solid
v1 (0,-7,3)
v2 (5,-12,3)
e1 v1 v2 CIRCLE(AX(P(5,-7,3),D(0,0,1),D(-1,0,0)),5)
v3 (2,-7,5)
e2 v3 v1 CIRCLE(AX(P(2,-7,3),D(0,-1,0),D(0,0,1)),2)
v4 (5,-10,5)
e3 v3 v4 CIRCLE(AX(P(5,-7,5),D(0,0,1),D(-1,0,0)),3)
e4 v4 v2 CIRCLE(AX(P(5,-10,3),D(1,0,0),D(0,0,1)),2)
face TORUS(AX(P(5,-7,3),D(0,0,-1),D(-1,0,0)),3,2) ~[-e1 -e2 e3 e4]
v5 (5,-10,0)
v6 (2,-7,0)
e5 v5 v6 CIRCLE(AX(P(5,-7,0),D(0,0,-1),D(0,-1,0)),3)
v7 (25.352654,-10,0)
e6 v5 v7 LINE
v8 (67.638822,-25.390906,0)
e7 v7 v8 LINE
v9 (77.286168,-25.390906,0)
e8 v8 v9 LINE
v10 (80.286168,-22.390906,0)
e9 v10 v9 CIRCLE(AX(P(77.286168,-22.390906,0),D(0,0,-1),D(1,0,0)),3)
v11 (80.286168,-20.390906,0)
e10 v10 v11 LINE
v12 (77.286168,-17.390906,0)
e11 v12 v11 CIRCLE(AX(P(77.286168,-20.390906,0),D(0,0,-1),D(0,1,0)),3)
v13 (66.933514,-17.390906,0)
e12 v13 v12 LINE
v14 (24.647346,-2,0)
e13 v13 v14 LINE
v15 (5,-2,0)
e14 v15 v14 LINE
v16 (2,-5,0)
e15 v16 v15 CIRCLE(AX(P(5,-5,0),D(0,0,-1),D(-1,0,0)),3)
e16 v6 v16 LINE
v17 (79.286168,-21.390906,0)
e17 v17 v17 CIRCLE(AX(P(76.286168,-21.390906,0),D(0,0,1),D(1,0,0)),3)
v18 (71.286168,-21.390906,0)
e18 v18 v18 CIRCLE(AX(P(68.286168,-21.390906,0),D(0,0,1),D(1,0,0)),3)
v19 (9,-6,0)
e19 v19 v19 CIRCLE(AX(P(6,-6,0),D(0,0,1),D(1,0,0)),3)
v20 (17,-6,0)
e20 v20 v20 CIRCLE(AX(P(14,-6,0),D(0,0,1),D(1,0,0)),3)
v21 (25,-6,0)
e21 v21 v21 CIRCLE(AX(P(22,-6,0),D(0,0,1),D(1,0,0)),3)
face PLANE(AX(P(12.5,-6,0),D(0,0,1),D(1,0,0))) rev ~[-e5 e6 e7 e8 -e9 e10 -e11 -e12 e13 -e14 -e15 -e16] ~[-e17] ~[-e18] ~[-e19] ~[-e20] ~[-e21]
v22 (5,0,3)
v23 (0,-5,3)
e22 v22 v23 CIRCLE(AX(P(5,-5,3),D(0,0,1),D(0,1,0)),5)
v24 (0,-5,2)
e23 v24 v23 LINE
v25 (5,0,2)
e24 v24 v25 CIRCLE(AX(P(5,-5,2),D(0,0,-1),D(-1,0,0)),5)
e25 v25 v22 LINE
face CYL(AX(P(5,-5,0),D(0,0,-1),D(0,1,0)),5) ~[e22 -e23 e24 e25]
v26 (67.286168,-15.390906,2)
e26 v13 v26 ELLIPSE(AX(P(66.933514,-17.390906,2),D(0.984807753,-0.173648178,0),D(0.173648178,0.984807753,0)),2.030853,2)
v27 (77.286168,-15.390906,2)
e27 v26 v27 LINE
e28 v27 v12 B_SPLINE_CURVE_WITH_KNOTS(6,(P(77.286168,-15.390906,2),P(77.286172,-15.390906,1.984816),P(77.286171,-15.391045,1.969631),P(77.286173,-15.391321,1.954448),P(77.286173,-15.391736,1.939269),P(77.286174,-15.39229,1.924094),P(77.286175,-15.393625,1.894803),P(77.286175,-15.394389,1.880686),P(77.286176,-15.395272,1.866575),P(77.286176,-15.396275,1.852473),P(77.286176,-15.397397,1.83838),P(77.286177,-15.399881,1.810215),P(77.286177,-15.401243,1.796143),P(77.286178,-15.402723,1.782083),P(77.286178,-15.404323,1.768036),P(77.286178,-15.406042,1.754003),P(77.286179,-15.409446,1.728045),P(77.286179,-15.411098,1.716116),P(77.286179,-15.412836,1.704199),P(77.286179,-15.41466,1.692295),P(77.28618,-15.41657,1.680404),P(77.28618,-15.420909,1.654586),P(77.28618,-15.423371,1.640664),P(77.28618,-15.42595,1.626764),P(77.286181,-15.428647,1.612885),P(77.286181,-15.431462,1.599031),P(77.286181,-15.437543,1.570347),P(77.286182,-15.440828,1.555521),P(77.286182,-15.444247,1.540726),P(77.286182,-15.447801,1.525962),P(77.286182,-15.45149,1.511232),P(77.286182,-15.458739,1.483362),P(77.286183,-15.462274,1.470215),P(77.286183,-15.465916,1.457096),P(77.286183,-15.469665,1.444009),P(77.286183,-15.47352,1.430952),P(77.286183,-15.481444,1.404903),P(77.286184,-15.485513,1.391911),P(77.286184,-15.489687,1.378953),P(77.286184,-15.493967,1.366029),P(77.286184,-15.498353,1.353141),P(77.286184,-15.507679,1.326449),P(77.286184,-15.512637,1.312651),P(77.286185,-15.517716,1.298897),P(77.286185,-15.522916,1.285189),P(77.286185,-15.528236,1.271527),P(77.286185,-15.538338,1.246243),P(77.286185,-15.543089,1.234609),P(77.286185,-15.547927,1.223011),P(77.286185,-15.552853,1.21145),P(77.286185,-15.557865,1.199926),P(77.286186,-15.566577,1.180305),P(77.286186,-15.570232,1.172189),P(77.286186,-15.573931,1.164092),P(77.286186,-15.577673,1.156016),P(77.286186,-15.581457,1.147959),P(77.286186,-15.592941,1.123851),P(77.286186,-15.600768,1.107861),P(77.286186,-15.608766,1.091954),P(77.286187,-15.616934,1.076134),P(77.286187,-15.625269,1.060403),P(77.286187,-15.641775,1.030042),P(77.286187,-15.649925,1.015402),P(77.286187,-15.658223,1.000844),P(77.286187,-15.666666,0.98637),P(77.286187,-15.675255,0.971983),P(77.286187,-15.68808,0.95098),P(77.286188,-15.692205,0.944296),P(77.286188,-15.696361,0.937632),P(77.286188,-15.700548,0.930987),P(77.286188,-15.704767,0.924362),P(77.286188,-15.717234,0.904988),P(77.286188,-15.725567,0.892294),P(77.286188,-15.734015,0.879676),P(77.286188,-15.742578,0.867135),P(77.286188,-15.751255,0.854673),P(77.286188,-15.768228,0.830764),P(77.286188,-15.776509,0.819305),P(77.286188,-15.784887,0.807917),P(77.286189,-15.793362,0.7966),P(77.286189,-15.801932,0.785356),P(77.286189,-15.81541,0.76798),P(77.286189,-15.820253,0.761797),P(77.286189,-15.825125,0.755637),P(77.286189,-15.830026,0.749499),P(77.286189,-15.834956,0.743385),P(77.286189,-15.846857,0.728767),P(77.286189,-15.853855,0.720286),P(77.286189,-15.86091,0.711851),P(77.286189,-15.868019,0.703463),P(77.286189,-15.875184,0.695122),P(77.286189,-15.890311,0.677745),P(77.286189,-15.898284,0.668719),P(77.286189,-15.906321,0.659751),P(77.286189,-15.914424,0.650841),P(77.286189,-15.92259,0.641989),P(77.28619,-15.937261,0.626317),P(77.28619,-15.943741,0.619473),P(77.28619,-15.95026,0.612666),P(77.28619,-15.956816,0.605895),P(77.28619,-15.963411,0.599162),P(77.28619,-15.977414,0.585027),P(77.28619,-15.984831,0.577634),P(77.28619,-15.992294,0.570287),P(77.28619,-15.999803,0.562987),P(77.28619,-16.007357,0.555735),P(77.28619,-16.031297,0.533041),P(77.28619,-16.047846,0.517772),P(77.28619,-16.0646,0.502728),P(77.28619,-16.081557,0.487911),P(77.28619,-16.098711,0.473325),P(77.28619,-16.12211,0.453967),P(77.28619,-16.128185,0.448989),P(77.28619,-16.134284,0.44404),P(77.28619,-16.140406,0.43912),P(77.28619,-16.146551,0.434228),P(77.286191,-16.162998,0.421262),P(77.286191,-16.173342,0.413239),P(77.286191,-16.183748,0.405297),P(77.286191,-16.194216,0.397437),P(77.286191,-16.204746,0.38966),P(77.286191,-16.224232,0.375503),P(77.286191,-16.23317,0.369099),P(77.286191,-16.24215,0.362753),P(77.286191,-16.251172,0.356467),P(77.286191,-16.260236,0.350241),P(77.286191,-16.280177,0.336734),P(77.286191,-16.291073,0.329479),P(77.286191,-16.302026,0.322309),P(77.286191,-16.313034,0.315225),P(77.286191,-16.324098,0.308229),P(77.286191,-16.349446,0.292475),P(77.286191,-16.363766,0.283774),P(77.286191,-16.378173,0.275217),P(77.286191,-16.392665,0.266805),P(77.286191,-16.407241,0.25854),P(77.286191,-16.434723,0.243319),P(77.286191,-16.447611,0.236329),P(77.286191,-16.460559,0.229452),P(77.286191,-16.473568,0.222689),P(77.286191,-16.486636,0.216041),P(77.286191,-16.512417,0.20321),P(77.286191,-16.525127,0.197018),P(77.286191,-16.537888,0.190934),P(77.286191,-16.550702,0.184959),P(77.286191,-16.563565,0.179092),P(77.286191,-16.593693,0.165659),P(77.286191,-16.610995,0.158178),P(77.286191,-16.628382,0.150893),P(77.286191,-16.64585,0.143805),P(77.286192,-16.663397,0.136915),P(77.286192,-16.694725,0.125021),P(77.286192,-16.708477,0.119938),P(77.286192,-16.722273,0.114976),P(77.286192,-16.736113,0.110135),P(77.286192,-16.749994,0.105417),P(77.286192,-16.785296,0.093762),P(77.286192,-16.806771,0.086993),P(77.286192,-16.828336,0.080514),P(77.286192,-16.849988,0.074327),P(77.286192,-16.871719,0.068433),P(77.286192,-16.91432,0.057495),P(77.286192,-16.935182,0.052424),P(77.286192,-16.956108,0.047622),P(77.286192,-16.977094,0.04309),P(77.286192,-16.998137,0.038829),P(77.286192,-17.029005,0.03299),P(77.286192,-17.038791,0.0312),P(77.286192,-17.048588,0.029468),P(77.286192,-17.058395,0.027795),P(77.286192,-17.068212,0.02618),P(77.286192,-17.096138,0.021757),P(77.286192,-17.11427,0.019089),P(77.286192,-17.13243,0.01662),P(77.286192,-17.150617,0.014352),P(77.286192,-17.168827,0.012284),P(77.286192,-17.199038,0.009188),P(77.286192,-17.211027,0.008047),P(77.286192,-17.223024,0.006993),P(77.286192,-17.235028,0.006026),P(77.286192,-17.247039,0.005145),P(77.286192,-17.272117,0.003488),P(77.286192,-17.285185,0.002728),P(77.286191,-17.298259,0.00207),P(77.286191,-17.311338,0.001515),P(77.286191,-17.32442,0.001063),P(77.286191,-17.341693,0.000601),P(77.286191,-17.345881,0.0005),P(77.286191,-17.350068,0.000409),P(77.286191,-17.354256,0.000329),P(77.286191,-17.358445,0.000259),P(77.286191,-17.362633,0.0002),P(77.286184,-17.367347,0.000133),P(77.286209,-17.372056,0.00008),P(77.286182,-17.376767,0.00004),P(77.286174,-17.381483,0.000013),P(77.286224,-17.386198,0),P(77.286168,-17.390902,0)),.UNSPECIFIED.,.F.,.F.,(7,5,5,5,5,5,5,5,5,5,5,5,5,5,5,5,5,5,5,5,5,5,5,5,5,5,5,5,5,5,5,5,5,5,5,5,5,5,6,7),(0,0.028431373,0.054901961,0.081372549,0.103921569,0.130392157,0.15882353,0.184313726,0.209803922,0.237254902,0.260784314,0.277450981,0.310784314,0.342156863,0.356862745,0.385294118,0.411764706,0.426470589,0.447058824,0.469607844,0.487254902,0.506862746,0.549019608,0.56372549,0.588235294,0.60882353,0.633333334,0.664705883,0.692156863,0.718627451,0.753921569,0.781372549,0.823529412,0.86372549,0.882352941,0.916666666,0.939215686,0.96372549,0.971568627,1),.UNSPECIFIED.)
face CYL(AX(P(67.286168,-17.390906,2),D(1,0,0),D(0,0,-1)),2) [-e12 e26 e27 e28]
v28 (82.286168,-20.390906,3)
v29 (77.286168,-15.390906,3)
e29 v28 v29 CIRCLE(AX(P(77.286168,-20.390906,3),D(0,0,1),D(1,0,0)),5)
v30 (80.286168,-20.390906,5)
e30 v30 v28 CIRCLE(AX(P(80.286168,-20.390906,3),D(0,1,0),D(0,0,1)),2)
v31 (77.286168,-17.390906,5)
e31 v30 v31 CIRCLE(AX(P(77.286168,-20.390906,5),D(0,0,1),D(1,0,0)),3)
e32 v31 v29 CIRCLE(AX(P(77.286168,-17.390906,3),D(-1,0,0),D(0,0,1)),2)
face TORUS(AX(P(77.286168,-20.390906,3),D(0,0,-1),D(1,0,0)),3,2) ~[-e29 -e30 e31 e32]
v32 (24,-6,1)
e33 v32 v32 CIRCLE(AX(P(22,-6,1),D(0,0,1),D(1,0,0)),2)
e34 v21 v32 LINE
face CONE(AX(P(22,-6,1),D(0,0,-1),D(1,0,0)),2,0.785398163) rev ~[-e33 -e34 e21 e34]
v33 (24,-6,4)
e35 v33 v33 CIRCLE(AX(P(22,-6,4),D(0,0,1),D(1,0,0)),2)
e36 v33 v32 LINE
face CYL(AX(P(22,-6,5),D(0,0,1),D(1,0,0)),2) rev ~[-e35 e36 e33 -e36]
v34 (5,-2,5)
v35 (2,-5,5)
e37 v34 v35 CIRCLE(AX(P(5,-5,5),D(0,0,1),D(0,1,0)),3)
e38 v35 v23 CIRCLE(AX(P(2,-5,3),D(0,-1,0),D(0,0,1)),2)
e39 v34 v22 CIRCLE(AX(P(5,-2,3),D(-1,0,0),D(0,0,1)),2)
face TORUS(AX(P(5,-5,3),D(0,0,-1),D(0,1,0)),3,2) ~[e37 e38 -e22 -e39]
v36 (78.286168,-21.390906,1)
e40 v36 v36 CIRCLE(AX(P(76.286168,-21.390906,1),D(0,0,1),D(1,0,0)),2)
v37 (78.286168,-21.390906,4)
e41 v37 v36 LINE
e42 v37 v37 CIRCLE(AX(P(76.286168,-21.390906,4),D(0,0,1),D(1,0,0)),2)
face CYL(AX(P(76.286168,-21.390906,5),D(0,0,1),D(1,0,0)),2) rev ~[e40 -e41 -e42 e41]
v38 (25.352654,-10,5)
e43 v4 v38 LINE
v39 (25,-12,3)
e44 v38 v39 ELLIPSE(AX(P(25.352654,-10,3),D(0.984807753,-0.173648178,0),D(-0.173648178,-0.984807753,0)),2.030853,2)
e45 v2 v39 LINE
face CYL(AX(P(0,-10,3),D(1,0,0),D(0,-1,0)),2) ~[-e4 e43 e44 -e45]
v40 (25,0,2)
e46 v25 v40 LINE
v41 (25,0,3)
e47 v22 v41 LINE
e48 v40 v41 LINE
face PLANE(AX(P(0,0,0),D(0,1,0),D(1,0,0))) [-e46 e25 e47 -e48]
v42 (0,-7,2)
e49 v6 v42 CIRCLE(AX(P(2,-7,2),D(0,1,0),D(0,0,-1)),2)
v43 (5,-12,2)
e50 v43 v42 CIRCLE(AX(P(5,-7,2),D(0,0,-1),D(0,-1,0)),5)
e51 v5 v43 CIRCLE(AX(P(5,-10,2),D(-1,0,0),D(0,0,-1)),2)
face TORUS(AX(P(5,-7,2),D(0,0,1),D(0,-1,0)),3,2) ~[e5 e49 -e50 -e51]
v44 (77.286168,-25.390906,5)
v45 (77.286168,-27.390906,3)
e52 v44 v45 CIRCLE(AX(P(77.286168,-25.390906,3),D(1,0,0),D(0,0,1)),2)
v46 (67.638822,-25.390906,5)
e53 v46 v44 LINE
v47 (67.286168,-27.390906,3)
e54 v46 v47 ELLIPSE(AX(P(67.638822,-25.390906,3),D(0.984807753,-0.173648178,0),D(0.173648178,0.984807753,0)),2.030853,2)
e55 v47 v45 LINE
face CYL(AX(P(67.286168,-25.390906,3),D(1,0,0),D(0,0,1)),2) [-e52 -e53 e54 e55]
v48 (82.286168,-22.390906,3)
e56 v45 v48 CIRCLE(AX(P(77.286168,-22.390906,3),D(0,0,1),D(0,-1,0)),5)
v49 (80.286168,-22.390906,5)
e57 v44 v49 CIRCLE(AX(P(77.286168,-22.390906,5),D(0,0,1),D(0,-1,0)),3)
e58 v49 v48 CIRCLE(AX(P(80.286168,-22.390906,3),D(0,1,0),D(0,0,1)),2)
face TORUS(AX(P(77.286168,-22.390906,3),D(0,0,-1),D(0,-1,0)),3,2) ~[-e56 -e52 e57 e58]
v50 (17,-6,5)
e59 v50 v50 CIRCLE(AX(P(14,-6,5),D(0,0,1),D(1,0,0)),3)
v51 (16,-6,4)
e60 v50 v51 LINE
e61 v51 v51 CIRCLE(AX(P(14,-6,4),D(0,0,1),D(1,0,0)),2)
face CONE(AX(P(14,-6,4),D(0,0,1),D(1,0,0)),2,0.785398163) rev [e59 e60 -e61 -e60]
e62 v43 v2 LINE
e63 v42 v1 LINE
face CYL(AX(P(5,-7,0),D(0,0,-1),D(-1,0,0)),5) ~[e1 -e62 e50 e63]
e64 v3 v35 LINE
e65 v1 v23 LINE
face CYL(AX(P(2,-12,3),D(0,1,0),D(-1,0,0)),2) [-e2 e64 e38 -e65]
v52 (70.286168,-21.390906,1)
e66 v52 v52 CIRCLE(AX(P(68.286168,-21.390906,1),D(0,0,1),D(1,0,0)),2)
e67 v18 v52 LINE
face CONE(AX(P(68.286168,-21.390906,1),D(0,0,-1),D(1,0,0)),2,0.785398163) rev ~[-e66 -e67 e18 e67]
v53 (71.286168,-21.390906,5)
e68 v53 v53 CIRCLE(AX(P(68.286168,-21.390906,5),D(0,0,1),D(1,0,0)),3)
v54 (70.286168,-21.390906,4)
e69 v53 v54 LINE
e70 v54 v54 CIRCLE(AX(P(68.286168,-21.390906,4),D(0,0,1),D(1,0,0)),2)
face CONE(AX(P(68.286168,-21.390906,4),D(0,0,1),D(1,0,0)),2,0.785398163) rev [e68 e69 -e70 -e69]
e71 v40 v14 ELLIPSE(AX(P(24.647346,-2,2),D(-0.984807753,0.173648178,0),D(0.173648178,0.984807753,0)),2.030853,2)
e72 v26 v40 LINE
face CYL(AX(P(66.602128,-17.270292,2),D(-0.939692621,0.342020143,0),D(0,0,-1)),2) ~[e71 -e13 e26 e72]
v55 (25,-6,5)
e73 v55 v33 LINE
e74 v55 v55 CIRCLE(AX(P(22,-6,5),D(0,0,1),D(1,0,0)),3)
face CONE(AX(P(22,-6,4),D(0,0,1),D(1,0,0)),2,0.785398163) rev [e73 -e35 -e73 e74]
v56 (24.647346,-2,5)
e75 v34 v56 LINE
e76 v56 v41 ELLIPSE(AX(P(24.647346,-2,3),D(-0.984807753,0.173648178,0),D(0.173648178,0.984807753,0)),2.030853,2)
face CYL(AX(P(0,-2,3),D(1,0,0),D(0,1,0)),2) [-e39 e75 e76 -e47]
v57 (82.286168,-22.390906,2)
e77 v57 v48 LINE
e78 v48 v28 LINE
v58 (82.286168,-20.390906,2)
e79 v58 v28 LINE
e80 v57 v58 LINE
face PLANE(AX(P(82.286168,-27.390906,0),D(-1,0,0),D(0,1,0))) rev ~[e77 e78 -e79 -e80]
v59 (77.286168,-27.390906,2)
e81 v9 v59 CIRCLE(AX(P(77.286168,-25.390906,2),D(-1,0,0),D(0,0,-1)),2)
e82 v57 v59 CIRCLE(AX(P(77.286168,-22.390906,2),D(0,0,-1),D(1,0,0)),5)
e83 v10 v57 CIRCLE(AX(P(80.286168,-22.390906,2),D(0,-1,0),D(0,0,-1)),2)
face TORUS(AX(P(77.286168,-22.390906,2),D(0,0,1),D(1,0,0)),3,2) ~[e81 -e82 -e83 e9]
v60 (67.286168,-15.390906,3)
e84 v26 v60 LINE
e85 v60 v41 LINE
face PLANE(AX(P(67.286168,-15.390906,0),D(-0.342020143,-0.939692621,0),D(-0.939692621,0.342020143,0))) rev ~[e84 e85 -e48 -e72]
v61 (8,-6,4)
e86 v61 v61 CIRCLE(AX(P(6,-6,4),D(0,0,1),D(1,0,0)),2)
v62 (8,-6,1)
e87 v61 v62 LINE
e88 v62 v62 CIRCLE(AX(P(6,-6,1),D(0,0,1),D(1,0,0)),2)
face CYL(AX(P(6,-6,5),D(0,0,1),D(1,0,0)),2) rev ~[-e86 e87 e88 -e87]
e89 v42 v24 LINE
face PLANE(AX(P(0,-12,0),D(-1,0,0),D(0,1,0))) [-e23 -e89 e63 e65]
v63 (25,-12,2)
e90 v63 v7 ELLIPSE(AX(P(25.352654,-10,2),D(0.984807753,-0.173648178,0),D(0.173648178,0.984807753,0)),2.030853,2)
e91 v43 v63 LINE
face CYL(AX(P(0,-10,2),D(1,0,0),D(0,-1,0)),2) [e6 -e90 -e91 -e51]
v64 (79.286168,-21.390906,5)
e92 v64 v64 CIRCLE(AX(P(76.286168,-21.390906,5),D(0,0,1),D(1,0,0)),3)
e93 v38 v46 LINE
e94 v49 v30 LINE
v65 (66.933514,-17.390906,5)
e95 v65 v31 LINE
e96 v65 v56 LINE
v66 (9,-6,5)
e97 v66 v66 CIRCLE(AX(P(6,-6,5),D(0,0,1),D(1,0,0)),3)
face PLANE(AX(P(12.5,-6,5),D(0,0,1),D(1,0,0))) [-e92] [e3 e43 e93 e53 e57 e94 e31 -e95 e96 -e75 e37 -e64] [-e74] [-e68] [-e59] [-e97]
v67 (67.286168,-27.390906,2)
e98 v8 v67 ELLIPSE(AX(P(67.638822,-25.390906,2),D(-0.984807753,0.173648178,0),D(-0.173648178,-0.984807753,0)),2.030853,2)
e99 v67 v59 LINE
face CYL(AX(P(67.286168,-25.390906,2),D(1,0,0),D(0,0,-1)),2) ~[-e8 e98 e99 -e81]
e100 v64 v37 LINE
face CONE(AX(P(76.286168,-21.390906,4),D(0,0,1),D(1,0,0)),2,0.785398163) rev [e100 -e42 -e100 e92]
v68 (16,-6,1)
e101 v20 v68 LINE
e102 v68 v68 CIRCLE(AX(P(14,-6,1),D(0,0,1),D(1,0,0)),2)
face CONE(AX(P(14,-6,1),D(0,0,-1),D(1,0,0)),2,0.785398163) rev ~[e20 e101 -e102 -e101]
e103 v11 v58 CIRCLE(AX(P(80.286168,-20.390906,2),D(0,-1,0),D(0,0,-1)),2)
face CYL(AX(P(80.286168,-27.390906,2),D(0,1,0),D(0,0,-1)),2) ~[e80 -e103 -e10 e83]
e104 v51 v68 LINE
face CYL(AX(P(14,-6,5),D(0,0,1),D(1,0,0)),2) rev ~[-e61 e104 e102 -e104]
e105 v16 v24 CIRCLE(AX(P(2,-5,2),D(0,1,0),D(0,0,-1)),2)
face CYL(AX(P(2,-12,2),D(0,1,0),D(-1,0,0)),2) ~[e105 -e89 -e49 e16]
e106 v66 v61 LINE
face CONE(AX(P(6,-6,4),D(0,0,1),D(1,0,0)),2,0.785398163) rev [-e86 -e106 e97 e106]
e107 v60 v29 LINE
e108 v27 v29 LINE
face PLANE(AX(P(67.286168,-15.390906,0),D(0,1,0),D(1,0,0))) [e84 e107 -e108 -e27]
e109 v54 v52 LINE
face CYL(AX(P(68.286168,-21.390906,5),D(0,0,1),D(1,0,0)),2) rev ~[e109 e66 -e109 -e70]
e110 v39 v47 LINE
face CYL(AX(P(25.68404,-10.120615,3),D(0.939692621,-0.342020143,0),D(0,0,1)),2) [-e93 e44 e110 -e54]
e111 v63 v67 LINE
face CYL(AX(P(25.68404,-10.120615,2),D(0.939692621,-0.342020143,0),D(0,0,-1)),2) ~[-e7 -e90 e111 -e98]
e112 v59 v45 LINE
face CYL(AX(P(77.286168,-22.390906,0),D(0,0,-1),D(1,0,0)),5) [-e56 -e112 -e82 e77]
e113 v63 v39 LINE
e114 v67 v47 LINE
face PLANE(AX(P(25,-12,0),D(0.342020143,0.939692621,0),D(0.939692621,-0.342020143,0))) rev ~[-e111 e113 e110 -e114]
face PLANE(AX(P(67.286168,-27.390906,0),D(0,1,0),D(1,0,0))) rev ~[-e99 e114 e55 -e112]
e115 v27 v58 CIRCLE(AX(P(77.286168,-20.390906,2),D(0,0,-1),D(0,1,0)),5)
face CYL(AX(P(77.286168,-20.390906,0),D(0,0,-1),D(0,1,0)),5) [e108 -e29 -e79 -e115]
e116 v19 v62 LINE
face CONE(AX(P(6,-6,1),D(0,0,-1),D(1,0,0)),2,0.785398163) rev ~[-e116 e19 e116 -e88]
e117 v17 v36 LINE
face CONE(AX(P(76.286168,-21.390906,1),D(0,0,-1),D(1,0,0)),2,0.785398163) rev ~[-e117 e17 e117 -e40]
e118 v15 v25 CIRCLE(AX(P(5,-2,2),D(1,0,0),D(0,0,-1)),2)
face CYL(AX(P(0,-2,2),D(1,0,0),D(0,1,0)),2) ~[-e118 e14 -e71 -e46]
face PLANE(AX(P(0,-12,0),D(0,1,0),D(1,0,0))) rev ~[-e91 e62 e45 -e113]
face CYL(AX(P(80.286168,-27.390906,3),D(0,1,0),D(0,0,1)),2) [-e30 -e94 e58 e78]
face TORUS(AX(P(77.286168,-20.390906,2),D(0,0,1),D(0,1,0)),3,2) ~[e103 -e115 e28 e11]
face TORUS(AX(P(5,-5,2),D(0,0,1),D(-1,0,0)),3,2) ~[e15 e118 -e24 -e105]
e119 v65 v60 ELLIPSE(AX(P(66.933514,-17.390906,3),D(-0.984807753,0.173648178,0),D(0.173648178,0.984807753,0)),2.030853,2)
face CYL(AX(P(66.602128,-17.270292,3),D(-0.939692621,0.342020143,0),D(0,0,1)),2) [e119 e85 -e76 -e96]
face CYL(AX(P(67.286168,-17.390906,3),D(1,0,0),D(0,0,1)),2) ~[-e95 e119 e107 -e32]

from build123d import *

# Parameters (mm, degrees)
F0_W         = 25
F0_H         = 12
F0_W_2       = 15
F1_DEPTH     = 5
F2_R         = 2
F3_DEPTH     = 5.001
F4_R         = 2
F5_T1_DEPTH  = 5
F5_T4_ANGLE  = 90
F5_T6_ANGLE  = 90
F5_T8_ANGLE  = 90
F5_T10_ANGLE = 90
F5_T12_ANGLE = 90
F5_T14_ANGLE = 90
F5_T16_ANGLE = 90
F5_T18_ANGLE = 90
F6_SIZE      = 1


# Not quite as in the source:
# - a fillet or chamfer that OpenCascade refuses, or shapes differently, is made with other operations: its cross-section is extruded or revolved along the edge and cut away or added


with BuildPart() as f1:
    # F0 (on Top) → F1 (new body)
    with BuildSketch(Plane.XY):
        with Locations((12.5, -6)):
            Rectangle(F0_W, F0_H)
        Polygon((67.2861679354, -15.3909064497), (25, 0), (25, -12), (67.2861679354, -27.3909064497), align=None)
        with Locations((74.7861679354, -21.3909064497)):
            Rectangle(F0_W_2, F0_H)
    extrude(amount=F1_DEPTH)

    # F2 (on face) → F3 (cut, through all)
    with BuildSketch(Plane.XY.offset(5)):
        with Locations((6, -6)):
            Circle(F2_R)
        with Locations((76.2861679354, -21.3909064497)):
            Circle(F2_R)
        with Locations((14, -6)):
            Circle(F2_R)
        with Locations((22, -6)):
            Circle(F2_R)
        with Locations((68.2861679354, -21.3909064497)):
            Circle(F2_R)
    extrude(amount=-F3_DEPTH, mode=Mode.SUBTRACT)

    # F4
    f4_edges = [f1.edges().sort_by_distance(p)[0] for p in [
        (46.143084, -7.695453, 5),
        (74.786168, -15.390906, 5),
        (82.286168, -21.390906, 5),
        (74.786168, -27.390906, 5),
        (46.143084, -19.695453, 5),
        (12.5, -12, 5),
        (0, -6, 5),
        (12.5, 0, 5),
        (12.5, -12, 0),
        (0, -6, 0),
        (12.5, 0, 0),
        (46.143084, -7.695453, 0),
        (46.143084, -19.695453, 0),
        (74.786168, -27.390906, 0),
        (74.786168, -15.390906, 0),
        (82.286168, -21.390906, 0),
    ]]
    fillet(f4_edges, radius=F4_R)

    # F5: fillet of radius 5 on 4 edges, made by hand

    # F5_s2 → F5_t1 (cut)
    with BuildSketch(Plane.XY):
        with BuildLine():
            ThreePointArc((77.2861679354, -15.3909064497), (80.8217018413, -16.8553725437), (82.2861679354, -20.3909064497))
            Line((82.2861679354, -20.3909064497), (82.2861679354, -15.3909064497))
            Line((82.2861679354, -15.3909064497), (77.2861679354, -15.3909064497))
        make_face()
        with BuildLine():
            ThreePointArc((82.2861679354, -22.3909064497), (80.8217018413, -25.9264403556), (77.2861679354, -27.3909064497))
            Line((77.2861679354, -27.3909064497), (82.2861679354, -27.3909064497))
            Line((82.2861679354, -27.3909064497), (82.2861679354, -22.3909064497))
        make_face()
        with BuildLine():
            ThreePointArc((0, -7), (1.4644660941, -10.5355339059), (5, -12))
            Line((5, -12), (0, -12))
            Line((0, -12), (0, -7))
        make_face()
        with BuildLine():
            ThreePointArc((5, 0), (1.4644660941, -1.4644660941), (0, -5))
            Line((0, -5), (0, 0))
            Line((0, 0), (5, 0))
        make_face()
    extrude(amount=F5_T1_DEPTH, mode=Mode.SUBTRACT)

    # F5_s3 → F5_t4 (revolve, cut)
    with BuildSketch(Plane.XZ.offset(5)):
        with BuildLine():
            ThreePointArc((2, 0), (0.5857864376, 0.5857864376), (0, 2))
            Line((0, 2), (0, 0))
            Line((0, 0), (2, 0))
        make_face()
    revolve(axis=Axis((5, -5, 0), (0, 0, -1)), revolution_arc=F5_T4_ANGLE, mode=Mode.SUBTRACT)

    # F5_s5 → F5_t6 (revolve, cut)
    with BuildSketch(Plane.YZ.offset(5)):
        with BuildLine():
            ThreePointArc((-10, 0), (-11.4142135624, 0.5857864376), (-12, 2))
            Line((-12, 2), (-12, 0))
            Line((-12, 0), (-10, 0))
        make_face()
    revolve(axis=Axis((5, -7, 0), (0, 0, -1)), revolution_arc=F5_T6_ANGLE, mode=Mode.SUBTRACT)

    # F5_s7 → F5_t8 (revolve, cut)
    with BuildSketch(Plane.XZ.offset(22.3909064497)):
        with BuildLine():
            ThreePointArc((80.2861679354, 0), (81.7003814977, 0.5857864376), (82.2861679354, 2))
            Line((82.2861679354, 2), (82.2861679354, 0))
            Line((82.2861679354, 0), (80.2861679354, 0))
        make_face()
    revolve(axis=Axis((77.2861679354, -22.3909064497, 0), (0, 0, -1)), revolution_arc=F5_T8_ANGLE, mode=Mode.SUBTRACT)

    # F5_s9 → F5_t10 (revolve, cut)
    with BuildSketch(Plane.YZ.offset(77.2861679354)):
        with BuildLine():
            ThreePointArc((-17.3909064497, 0), (-15.9766928873, 0.5857864376), (-15.3909064497, 2))
            Line((-15.3909064497, 2), (-15.3909064497, 0))
            Line((-15.3909064497, 0), (-17.3909064497, 0))
        make_face()
    revolve(axis=Axis((77.2861679354, -20.3909064497, 0), (0, 0, -1)), revolution_arc=F5_T10_ANGLE, mode=Mode.SUBTRACT)

    # F5_s11 → F5_t12 (revolve, cut)
    with BuildSketch(Plane.XZ.offset(20.3909064497)):
        with BuildLine():
            ThreePointArc((80.2861679354, 5), (81.7003814977, 4.4142135624), (82.2861679354, 3))
            Line((82.2861679354, 3), (82.2861679354, 5))
            Line((82.2861679354, 5), (80.2861679354, 5))
        make_face()
    revolve(axis=Axis((77.2861679354, -20.3909064497, 5), (0, 0, 1)), revolution_arc=F5_T12_ANGLE, mode=Mode.SUBTRACT)

    # F5_s13 → F5_t14 (revolve, cut)
    with BuildSketch(Plane.YZ.offset(77.2861679354)):
        with BuildLine():
            ThreePointArc((-25.3909064497, 5), (-26.805120012, 4.4142135624), (-27.3909064497, 3))
            Line((-27.3909064497, 3), (-27.3909064497, 5))
            Line((-27.3909064497, 5), (-25.3909064497, 5))
        make_face()
    revolve(axis=Axis((77.2861679354, -22.3909064497, 5), (0, 0, 1)), revolution_arc=F5_T14_ANGLE, mode=Mode.SUBTRACT)

    # F5_s15 → F5_t16 (revolve, cut)
    with BuildSketch(Plane.XZ.offset(7)):
        with BuildLine():
            ThreePointArc((2, 5), (0.5857864376, 4.4142135624), (0, 3))
            Line((0, 3), (0, 5))
            Line((0, 5), (2, 5))
        make_face()
    revolve(axis=Axis((5, -7, 5), (0, 0, 1)), revolution_arc=F5_T16_ANGLE, mode=Mode.SUBTRACT)

    # F5_s17 → F5_t18 (revolve, cut)
    with BuildSketch(Plane.YZ.offset(5)):
        with BuildLine():
            ThreePointArc((-2, 5), (-0.5857864376, 4.4142135624), (0, 3))
            Line((0, 3), (0, 5))
            Line((0, 5), (-2, 5))
        make_face()
    revolve(axis=Axis((5, -5, 5), (0, 0, 1)), revolution_arc=F5_T18_ANGLE, mode=Mode.SUBTRACT)

    # F6
    f6_edges = [f1.edges().sort_by_distance(p)[0] for p in [
        (20, -6, 5),
        (24, -6, 2.5),
        (20, -6, 0),
        (12, -6, 5),
        (16, -6, 2.5),
        (12, -6, 0),
        (4, -6, 5),
        (8, -6, 2.5),
        (4, -6, 0),
        (66.286168, -21.390906, 5),
        (70.286168, -21.390906, 2.5),
        (66.286168, -21.390906, 0),
        (74.286168, -21.390906, 5),
        (78.286168, -21.390906, 2.5),
        (74.286168, -21.390906, 0),
    ]]
    chamfer(f6_edges, length=F6_SIZE)


solid = f1.part
